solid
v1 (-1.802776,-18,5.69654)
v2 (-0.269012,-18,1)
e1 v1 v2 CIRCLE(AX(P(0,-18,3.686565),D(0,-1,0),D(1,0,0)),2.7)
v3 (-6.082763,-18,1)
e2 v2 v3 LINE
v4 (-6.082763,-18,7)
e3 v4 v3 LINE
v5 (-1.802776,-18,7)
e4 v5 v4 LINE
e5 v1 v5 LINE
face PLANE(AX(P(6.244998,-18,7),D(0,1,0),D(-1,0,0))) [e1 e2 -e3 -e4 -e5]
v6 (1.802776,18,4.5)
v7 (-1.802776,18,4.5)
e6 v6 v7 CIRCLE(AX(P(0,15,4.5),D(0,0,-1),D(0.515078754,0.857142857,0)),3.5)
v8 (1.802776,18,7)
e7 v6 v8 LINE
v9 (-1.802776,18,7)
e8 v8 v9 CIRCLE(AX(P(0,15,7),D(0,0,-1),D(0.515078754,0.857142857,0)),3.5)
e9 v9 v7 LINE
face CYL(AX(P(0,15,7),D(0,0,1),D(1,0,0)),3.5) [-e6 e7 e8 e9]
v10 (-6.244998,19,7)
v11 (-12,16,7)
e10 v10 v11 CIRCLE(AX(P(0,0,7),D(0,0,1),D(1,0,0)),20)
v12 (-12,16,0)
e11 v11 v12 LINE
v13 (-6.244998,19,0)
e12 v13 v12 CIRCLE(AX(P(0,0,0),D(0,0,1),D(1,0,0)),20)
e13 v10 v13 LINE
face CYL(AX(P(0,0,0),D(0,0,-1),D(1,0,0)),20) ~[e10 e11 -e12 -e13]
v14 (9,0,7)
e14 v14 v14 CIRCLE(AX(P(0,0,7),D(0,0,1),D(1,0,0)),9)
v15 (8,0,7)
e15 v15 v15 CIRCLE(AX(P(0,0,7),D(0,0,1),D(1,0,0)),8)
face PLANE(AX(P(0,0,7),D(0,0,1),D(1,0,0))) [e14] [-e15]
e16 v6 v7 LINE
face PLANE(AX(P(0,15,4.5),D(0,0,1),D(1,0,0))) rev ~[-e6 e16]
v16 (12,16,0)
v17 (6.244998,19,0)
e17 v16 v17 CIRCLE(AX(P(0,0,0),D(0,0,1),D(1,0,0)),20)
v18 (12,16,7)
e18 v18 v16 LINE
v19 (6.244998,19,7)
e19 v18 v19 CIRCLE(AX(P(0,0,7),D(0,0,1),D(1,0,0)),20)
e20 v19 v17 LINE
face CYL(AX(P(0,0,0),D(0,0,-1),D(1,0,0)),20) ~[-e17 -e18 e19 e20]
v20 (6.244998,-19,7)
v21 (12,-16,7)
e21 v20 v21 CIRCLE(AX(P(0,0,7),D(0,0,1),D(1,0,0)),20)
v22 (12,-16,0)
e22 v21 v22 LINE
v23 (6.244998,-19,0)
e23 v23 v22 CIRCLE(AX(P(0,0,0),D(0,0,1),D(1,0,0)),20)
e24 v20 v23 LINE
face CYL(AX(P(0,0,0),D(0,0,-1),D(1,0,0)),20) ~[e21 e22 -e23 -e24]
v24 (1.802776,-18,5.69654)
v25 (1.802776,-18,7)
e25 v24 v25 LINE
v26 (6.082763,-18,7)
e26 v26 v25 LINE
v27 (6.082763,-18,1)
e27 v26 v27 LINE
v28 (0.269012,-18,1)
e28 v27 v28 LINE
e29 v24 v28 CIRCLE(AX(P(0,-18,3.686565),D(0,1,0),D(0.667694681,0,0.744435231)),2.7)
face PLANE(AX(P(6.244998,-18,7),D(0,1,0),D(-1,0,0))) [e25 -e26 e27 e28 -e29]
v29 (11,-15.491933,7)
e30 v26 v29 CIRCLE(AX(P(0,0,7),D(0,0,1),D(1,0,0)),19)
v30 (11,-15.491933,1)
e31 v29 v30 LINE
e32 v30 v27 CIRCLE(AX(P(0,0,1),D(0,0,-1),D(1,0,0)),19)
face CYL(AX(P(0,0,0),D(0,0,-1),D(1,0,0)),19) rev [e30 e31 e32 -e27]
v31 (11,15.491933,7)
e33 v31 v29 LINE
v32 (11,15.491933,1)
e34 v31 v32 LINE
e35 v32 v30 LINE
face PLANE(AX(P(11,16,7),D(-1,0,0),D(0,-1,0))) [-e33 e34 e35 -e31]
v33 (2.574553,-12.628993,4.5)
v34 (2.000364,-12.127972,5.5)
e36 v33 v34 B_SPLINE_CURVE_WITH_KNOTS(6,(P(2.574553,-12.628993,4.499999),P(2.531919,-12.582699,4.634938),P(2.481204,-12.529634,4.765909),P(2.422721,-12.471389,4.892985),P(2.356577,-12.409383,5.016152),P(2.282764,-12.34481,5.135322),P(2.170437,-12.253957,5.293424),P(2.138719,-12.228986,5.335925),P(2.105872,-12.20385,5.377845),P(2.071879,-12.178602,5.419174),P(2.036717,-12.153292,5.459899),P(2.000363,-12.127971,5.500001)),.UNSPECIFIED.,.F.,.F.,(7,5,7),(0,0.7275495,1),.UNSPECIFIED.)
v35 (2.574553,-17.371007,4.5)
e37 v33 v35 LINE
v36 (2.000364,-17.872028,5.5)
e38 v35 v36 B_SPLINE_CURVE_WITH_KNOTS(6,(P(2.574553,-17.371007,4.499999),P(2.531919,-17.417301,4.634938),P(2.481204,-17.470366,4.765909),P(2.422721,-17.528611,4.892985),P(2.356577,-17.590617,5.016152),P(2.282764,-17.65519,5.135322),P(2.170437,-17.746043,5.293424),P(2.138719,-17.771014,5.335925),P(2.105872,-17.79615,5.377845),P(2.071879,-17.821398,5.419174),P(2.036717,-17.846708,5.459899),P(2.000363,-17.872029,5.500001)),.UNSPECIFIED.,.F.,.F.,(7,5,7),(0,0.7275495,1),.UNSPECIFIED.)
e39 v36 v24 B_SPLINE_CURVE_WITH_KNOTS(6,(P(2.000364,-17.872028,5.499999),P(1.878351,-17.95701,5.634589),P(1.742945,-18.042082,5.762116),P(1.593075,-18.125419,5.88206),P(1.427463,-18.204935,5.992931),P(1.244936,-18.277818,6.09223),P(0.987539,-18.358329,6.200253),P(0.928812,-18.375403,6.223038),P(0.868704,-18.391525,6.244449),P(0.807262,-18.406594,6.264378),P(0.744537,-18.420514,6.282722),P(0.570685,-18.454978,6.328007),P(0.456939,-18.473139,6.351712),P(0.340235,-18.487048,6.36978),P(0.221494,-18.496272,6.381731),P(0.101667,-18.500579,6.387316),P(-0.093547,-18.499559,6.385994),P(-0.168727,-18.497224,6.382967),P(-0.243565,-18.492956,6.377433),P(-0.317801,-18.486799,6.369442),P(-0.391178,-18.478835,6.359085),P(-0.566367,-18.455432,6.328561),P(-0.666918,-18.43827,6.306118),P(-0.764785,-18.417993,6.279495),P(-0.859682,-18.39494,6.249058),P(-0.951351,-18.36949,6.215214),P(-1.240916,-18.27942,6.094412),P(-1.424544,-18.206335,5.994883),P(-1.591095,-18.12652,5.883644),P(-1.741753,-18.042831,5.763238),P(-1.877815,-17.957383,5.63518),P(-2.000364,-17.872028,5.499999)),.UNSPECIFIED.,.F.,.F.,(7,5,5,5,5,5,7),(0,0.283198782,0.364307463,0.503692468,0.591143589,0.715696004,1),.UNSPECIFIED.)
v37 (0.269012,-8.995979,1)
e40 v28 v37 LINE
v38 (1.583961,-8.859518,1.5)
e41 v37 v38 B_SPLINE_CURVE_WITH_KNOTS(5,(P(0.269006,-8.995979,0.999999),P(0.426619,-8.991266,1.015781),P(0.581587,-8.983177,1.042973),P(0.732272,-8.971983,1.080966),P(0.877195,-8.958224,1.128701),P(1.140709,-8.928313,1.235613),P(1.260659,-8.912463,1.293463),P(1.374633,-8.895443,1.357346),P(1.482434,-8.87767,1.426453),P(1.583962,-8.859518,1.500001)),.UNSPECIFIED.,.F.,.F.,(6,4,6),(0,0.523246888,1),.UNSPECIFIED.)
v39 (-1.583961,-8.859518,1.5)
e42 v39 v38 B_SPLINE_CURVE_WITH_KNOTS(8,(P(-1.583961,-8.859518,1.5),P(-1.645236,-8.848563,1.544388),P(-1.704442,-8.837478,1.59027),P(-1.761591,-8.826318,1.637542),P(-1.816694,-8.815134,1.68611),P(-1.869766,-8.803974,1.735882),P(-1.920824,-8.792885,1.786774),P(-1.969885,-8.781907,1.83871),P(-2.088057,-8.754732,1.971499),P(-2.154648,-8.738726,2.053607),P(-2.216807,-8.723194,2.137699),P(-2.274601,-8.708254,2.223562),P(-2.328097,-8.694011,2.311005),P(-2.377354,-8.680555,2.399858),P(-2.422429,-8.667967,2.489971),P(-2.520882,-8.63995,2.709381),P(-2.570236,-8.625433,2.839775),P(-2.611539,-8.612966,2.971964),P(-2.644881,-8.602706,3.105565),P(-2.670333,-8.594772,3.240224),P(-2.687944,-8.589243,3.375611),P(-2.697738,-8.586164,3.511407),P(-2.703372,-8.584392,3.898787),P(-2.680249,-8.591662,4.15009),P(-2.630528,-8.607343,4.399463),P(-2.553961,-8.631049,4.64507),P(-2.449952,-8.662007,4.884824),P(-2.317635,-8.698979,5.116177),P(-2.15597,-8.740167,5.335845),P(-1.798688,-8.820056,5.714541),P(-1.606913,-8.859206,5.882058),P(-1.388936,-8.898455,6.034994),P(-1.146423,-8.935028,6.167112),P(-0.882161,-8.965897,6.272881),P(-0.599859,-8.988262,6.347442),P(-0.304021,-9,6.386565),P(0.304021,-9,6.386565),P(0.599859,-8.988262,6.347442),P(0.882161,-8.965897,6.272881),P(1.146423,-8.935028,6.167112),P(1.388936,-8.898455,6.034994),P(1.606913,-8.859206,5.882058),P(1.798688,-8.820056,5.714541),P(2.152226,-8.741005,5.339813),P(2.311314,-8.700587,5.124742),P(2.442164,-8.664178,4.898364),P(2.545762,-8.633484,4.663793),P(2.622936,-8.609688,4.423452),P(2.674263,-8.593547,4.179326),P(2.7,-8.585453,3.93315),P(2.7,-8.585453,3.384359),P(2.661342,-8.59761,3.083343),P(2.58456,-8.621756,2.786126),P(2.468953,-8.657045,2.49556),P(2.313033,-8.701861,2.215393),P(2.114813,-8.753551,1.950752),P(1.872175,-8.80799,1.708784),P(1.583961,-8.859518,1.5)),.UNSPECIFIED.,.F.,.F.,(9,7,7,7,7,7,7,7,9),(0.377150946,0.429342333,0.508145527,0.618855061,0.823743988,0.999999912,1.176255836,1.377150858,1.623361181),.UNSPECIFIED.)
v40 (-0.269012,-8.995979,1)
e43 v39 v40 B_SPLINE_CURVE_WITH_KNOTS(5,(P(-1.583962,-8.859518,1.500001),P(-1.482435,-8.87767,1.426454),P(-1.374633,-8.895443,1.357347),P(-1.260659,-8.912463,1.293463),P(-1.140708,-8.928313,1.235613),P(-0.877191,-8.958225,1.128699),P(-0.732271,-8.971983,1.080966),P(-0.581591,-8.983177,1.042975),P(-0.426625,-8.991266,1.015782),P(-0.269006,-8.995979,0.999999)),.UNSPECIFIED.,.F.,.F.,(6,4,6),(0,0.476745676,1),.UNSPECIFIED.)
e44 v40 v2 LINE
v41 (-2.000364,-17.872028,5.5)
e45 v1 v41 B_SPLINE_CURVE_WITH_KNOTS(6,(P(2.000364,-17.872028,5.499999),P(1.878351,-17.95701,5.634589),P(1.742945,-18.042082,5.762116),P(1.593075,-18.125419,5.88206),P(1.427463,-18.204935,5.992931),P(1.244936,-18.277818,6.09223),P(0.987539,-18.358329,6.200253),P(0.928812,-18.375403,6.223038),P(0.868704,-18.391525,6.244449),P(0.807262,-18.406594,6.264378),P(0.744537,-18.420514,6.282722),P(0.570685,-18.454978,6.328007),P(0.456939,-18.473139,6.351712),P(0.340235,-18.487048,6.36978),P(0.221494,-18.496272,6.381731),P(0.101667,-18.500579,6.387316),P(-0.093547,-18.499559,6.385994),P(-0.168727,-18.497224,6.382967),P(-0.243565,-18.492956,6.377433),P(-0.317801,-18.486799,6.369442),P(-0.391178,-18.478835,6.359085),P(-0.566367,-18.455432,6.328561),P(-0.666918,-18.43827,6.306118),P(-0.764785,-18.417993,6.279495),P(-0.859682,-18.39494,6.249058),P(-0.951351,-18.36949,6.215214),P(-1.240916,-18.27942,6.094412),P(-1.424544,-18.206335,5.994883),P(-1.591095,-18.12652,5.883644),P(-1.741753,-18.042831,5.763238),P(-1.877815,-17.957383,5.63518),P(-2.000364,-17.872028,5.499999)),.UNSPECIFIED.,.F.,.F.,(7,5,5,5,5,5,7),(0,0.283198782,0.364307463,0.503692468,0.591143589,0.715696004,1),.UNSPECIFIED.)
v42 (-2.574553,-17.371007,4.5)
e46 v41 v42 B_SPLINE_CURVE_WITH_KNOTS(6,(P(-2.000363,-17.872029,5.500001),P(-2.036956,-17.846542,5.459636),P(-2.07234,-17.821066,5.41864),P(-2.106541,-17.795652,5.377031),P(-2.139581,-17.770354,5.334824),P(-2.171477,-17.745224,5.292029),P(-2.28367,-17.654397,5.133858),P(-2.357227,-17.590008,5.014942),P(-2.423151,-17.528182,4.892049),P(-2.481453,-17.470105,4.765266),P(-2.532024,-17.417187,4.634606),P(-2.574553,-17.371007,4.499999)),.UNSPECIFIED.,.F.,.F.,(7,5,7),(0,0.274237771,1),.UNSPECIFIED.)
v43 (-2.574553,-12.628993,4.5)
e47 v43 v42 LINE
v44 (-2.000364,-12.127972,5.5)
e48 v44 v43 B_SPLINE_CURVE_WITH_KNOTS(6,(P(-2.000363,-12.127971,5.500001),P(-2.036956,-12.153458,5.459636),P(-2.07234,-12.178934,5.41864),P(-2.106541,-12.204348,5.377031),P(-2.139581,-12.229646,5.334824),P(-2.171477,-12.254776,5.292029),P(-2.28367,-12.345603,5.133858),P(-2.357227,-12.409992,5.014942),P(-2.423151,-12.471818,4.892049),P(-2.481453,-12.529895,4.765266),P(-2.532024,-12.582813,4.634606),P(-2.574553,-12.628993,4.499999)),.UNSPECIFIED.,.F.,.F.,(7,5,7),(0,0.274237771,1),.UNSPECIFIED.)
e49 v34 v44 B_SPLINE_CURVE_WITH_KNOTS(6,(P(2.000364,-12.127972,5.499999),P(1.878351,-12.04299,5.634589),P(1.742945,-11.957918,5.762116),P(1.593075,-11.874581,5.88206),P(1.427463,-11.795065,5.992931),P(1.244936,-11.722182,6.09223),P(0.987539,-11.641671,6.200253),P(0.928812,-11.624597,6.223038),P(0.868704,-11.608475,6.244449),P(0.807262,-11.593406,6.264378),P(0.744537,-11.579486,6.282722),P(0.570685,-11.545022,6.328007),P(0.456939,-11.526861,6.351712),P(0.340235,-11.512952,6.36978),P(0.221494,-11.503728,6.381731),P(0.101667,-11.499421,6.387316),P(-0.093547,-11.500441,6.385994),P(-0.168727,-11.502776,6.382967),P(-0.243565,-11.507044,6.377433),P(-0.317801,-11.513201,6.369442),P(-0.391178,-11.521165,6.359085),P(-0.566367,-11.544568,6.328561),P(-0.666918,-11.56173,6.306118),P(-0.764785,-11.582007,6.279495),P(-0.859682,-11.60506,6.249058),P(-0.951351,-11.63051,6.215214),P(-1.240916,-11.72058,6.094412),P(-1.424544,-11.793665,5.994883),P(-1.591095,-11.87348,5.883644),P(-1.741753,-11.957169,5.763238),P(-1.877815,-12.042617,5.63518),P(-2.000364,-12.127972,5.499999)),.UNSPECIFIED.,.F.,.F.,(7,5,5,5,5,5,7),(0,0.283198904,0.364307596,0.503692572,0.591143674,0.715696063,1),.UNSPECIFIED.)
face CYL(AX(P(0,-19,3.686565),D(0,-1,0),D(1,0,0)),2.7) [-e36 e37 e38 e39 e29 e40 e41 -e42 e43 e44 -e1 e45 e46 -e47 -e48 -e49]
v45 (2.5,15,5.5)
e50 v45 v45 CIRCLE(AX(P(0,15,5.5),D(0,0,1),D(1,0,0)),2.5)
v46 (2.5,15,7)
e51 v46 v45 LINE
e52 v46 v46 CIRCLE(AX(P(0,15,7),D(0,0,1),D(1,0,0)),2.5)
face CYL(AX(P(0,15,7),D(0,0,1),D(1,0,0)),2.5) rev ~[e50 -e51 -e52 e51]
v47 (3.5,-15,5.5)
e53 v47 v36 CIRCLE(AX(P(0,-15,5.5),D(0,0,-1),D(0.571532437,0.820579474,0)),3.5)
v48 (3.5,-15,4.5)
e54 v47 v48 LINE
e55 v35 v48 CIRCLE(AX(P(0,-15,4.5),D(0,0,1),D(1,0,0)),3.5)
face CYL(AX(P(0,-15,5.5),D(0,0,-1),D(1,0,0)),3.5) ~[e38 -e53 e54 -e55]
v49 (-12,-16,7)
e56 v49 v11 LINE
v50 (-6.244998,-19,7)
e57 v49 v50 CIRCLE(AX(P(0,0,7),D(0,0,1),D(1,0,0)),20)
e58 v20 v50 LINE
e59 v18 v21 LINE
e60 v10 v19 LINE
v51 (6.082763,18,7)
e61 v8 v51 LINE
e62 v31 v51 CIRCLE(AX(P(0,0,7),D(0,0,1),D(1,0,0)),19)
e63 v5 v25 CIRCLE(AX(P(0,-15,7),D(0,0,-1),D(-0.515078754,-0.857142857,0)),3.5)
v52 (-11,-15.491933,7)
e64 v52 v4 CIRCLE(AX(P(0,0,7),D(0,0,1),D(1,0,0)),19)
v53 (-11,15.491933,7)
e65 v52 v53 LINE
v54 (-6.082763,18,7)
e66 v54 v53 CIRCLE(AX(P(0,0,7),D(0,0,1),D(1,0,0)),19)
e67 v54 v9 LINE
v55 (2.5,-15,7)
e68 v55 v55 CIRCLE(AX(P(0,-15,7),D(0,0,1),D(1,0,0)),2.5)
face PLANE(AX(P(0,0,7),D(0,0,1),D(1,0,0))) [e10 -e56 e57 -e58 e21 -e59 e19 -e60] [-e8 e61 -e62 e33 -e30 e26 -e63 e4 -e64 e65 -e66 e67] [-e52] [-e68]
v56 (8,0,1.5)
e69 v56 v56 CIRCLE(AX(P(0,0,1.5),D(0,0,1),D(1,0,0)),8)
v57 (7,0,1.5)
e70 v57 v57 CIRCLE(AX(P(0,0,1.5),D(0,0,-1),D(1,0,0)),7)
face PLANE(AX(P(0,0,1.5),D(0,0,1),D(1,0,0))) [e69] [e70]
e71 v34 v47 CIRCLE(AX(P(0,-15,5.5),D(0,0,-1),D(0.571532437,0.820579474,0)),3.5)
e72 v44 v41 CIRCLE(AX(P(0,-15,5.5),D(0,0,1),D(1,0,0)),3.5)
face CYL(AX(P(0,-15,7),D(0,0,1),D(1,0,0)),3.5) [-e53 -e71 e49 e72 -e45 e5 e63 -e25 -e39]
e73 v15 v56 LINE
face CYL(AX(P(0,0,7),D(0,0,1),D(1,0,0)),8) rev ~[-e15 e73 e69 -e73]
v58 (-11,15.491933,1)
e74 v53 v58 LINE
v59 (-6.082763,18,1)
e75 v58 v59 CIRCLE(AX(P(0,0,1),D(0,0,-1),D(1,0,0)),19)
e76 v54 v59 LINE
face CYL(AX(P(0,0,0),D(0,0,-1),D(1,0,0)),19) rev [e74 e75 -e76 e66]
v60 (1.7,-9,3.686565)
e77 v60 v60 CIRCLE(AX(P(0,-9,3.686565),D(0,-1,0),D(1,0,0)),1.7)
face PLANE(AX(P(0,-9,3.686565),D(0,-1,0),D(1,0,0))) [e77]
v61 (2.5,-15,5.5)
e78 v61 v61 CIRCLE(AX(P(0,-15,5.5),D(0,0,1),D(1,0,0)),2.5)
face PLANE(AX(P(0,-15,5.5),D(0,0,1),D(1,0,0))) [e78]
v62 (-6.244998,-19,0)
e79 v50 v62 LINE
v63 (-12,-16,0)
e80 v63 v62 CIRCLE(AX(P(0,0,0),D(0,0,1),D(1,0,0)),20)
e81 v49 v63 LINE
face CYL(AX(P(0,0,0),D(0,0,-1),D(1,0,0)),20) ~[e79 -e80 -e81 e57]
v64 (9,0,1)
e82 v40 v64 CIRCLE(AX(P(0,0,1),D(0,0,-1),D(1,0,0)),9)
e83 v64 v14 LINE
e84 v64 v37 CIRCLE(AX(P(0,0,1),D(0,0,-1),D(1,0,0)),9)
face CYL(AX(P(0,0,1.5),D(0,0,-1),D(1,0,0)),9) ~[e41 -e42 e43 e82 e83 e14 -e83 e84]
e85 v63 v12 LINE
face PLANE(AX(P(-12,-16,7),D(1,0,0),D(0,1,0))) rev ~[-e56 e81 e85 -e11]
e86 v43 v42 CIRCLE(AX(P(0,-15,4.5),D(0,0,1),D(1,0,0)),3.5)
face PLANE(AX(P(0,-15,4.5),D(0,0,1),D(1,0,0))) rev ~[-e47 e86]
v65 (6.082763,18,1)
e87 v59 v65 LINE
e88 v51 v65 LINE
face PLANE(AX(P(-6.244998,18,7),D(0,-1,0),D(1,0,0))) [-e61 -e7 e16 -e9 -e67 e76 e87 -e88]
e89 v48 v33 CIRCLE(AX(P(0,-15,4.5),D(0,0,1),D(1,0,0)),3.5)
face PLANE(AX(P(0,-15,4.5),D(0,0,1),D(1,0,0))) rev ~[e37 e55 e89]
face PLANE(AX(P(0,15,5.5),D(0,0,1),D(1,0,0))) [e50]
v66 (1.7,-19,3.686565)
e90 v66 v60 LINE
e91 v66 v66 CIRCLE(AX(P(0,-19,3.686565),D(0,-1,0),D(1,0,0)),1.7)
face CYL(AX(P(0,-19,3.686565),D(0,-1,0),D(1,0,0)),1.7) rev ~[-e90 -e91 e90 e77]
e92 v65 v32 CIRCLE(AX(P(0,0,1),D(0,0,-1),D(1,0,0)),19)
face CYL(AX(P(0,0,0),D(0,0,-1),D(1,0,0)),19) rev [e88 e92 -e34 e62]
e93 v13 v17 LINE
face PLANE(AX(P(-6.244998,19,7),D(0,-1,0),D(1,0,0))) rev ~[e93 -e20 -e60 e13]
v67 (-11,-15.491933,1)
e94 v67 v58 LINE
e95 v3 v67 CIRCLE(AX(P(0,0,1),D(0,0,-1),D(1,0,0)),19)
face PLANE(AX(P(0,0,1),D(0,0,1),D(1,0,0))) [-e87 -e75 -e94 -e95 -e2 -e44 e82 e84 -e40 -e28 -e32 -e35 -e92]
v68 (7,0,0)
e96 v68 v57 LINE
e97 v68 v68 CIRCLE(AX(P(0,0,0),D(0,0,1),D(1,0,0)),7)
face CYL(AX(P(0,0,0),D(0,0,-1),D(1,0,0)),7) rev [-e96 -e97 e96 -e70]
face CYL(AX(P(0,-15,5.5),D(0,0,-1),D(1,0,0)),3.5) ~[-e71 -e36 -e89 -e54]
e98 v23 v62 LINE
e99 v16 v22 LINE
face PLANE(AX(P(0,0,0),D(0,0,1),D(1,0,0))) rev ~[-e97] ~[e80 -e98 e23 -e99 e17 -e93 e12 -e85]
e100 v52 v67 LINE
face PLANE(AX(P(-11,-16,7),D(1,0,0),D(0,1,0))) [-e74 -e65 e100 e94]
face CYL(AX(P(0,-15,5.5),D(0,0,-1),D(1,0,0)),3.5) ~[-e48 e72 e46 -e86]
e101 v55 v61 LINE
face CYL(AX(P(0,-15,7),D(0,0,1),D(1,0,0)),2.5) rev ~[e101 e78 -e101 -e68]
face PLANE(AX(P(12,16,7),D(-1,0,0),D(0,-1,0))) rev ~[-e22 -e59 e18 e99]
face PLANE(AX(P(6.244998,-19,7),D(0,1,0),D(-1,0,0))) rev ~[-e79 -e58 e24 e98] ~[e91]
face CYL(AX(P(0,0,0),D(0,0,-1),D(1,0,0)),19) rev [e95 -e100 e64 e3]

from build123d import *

# Parameters (mm, degrees)
F0_R     = 20
F0_R_2   = 7
F1_DEPTH = 7
F2_R     = 8
F3_DEPTH = 5.5
F4_R     = 2.5
F5_DEPTH = 1.5
F7_DEPTH = 25
F8_R     = 1.7
F9_DEPTH = 10
F10_T    = 1


# Not quite as in the source:
# - a shell that OpenCascade refuses in one call is made with other operations: the cavity is built on its own and cut out


with BuildPart() as f1:
    # F0 (on Top) → F1 (new body)
    with BuildSketch(Plane.XY):
        Circle(F0_R)
        Circle(F0_R_2, mode=Mode.SUBTRACT)
    extrude(amount=F1_DEPTH)

    # F2 (on face) → F3 (cut)
    with BuildSketch(Plane.XY.offset(7)):
        Circle(F2_R)
    extrude(amount=-F3_DEPTH, mode=Mode.SUBTRACT)

    # F4 (on face) → F5 (cut)
    with BuildSketch(Plane.XY.offset(7)):
        with Locations((0, 15)):
            Circle(F4_R)
        with Locations((0, -15)):
            Circle(F4_R)
    extrude(amount=-F5_DEPTH, mode=Mode.SUBTRACT)

    # F6 (on face) → F7 (cut)
    with BuildSketch(Plane.XY.offset(7)):
        with BuildLine():
            Line((-12, -16), (-12, 16))
            ThreePointArc((-12, 16), (-20, 0), (-12, -16))
        make_face()
        with BuildLine():
            Line((12, 16), (12, 19))
            Line((12, 19), (6.2449979984, 19))
            ThreePointArc((6.2449979984, 19), (9.2449979984, 17.7349939952), (12, 16))
        make_face()
        with BuildLine():
            ThreePointArc((-12, 16), (-9.2449979984, 17.7349939952), (-6.2449979984, 19))
            Line((-6.2449979984, 19), (-12, 19))
            Line((-12, 19), (-12, 16))
        make_face()
        with BuildLine():
            Line((12, -19), (12, -16))
            ThreePointArc((12, -16), (9.2449979984, -17.7349939952), (6.2449979984, -19))
            Line((6.2449979984, -19), (12, -19))
        make_face()
        with BuildLine():
            ThreePointArc((-6.2449979984, -19), (-9.2449979984, -17.7349939952), (-12, -16))
            Line((-12, -16), (-12, -19))
            Line((-12, -19), (-6.2449979984, -19))
        make_face()
        with BuildLine():
            ThreePointArc((20, 0), (17.88854382, 8.94427191), (12, 16))
            Line((12, 16), (12, -16))
            ThreePointArc((12, -16), (17.88854382, -8.94427191), (20, 0))
        make_face()
        with BuildLine():
            Line((-6.2449979984, 19), (6.2449979984, 19))
            ThreePointArc((6.2449979984, 19), (0, 20), (-6.2449979984, 19))
        make_face()
        with BuildLine():
            ThreePointArc((-6.2449979984, -19), (0, -20), (6.2449979984, -19))
            Line((6.2449979984, -19), (-6.2449979984, -19))
        make_face()
    extrude(amount=-F7_DEPTH, mode=Mode.SUBTRACT)

    # F8 (on face) → F9 (cut)
    with BuildSketch(Plane.XZ.offset(19)):
        with Locations((0, 3.6865652073)):
            Circle(F8_R)
    extrude(amount=-F9_DEPTH, mode=Mode.SUBTRACT)

    # F10: shell of thickness 1, made by hand


with BuildPart() as f10_core1:
    # F10_t2: copy of F1
    add(f1.part)

    # the walls: a layer under each face that stays
    f10_faces = [f10_core1.faces().sort_by_distance(p)[0] for p in [
        (9.2449979984, 17.7349939952, 3.5),
        (-8, -12.6666666667, 0),
        (0, 19, 3.5),
        (12, 0, 3.5),
        (9.2449979984, -17.7349939952, 3.5),
        (4.1633319989, -19, 1.1666666667),
        (-9.2449979984, -17.7349939952, 3.5),
        (-12, 0, 3.5),
        (-9.2449979984, 17.7349939952, 3.5),
        (-7, 0, 0.75),
        (-2.5, -15, 6.25),
        (-8, 0, 4.25),
        (-2.5, 15, 6.25),
        (-1.7, -14, 3.6865652073),
        (-5.3333333333, -5.3333333333, 1.5),
        (0, -15, 5.5),
        (0, 15, 5.5),
        (0, -9, 3.6865652073),
    ]]
    thicken(f10_faces, amount=-F10_T, mode=Mode.SUBTRACT)

    # F10_s3 → F10_t4 (revolve, cut)
    with BuildSketch(Plane.XZ.offset(15)):
        Polygon((2.49, 5.51), (3.5, 5.5), (3.5, 4.5), (2.5, 4.5), align=None)
    revolve(axis=Axis((0, -15, 5.5), (0, 0, 1)), mode=Mode.SUBTRACT)

    # F10_s5 → F10_t6 (revolve, cut)
    with BuildSketch(Plane.XZ):
        Polygon((7.99, 1.51), (9, 1.5), (9, 0.5), (8, 0.5), align=None)
    revolve(axis=Axis((0, 0, 1.5), (0, 0, 1)), mode=Mode.SUBTRACT)

    # F10_s7 → F10_t8 (revolve, cut)
    with BuildSketch(Plane.XZ.offset(-15)):
        Polygon((2.49, 5.51), (3.5, 5.5), (3.5, 4.5), (2.5, 4.5), align=None)
    revolve(axis=Axis((0, 15, 5.5), (0, 0, 1)), mode=Mode.SUBTRACT)

    # F10_s9 → F10_t10 (revolve, cut)
    with BuildSketch(Plane.XY.offset(3.6865652073)):
        Polygon((1.69, -9.01), (2.7, -9), (2.7, -8), (1.7, -8), align=None)
    revolve(axis=Axis((0, -9, 3.6865652073), (0, -1, 0)), mode=Mode.SUBTRACT)


with BuildPart() as f1_1:
    add(f1.part)

    # what is left inside the walls is the cavity
    f10_cavity = [f10_core1.part.solids().sort_by_distance(p)[0] for p in [
        (5.5, -14, 1.01),
    ]]
    add(f10_cavity, mode=Mode.SUBTRACT)


solid = f1_1.part
